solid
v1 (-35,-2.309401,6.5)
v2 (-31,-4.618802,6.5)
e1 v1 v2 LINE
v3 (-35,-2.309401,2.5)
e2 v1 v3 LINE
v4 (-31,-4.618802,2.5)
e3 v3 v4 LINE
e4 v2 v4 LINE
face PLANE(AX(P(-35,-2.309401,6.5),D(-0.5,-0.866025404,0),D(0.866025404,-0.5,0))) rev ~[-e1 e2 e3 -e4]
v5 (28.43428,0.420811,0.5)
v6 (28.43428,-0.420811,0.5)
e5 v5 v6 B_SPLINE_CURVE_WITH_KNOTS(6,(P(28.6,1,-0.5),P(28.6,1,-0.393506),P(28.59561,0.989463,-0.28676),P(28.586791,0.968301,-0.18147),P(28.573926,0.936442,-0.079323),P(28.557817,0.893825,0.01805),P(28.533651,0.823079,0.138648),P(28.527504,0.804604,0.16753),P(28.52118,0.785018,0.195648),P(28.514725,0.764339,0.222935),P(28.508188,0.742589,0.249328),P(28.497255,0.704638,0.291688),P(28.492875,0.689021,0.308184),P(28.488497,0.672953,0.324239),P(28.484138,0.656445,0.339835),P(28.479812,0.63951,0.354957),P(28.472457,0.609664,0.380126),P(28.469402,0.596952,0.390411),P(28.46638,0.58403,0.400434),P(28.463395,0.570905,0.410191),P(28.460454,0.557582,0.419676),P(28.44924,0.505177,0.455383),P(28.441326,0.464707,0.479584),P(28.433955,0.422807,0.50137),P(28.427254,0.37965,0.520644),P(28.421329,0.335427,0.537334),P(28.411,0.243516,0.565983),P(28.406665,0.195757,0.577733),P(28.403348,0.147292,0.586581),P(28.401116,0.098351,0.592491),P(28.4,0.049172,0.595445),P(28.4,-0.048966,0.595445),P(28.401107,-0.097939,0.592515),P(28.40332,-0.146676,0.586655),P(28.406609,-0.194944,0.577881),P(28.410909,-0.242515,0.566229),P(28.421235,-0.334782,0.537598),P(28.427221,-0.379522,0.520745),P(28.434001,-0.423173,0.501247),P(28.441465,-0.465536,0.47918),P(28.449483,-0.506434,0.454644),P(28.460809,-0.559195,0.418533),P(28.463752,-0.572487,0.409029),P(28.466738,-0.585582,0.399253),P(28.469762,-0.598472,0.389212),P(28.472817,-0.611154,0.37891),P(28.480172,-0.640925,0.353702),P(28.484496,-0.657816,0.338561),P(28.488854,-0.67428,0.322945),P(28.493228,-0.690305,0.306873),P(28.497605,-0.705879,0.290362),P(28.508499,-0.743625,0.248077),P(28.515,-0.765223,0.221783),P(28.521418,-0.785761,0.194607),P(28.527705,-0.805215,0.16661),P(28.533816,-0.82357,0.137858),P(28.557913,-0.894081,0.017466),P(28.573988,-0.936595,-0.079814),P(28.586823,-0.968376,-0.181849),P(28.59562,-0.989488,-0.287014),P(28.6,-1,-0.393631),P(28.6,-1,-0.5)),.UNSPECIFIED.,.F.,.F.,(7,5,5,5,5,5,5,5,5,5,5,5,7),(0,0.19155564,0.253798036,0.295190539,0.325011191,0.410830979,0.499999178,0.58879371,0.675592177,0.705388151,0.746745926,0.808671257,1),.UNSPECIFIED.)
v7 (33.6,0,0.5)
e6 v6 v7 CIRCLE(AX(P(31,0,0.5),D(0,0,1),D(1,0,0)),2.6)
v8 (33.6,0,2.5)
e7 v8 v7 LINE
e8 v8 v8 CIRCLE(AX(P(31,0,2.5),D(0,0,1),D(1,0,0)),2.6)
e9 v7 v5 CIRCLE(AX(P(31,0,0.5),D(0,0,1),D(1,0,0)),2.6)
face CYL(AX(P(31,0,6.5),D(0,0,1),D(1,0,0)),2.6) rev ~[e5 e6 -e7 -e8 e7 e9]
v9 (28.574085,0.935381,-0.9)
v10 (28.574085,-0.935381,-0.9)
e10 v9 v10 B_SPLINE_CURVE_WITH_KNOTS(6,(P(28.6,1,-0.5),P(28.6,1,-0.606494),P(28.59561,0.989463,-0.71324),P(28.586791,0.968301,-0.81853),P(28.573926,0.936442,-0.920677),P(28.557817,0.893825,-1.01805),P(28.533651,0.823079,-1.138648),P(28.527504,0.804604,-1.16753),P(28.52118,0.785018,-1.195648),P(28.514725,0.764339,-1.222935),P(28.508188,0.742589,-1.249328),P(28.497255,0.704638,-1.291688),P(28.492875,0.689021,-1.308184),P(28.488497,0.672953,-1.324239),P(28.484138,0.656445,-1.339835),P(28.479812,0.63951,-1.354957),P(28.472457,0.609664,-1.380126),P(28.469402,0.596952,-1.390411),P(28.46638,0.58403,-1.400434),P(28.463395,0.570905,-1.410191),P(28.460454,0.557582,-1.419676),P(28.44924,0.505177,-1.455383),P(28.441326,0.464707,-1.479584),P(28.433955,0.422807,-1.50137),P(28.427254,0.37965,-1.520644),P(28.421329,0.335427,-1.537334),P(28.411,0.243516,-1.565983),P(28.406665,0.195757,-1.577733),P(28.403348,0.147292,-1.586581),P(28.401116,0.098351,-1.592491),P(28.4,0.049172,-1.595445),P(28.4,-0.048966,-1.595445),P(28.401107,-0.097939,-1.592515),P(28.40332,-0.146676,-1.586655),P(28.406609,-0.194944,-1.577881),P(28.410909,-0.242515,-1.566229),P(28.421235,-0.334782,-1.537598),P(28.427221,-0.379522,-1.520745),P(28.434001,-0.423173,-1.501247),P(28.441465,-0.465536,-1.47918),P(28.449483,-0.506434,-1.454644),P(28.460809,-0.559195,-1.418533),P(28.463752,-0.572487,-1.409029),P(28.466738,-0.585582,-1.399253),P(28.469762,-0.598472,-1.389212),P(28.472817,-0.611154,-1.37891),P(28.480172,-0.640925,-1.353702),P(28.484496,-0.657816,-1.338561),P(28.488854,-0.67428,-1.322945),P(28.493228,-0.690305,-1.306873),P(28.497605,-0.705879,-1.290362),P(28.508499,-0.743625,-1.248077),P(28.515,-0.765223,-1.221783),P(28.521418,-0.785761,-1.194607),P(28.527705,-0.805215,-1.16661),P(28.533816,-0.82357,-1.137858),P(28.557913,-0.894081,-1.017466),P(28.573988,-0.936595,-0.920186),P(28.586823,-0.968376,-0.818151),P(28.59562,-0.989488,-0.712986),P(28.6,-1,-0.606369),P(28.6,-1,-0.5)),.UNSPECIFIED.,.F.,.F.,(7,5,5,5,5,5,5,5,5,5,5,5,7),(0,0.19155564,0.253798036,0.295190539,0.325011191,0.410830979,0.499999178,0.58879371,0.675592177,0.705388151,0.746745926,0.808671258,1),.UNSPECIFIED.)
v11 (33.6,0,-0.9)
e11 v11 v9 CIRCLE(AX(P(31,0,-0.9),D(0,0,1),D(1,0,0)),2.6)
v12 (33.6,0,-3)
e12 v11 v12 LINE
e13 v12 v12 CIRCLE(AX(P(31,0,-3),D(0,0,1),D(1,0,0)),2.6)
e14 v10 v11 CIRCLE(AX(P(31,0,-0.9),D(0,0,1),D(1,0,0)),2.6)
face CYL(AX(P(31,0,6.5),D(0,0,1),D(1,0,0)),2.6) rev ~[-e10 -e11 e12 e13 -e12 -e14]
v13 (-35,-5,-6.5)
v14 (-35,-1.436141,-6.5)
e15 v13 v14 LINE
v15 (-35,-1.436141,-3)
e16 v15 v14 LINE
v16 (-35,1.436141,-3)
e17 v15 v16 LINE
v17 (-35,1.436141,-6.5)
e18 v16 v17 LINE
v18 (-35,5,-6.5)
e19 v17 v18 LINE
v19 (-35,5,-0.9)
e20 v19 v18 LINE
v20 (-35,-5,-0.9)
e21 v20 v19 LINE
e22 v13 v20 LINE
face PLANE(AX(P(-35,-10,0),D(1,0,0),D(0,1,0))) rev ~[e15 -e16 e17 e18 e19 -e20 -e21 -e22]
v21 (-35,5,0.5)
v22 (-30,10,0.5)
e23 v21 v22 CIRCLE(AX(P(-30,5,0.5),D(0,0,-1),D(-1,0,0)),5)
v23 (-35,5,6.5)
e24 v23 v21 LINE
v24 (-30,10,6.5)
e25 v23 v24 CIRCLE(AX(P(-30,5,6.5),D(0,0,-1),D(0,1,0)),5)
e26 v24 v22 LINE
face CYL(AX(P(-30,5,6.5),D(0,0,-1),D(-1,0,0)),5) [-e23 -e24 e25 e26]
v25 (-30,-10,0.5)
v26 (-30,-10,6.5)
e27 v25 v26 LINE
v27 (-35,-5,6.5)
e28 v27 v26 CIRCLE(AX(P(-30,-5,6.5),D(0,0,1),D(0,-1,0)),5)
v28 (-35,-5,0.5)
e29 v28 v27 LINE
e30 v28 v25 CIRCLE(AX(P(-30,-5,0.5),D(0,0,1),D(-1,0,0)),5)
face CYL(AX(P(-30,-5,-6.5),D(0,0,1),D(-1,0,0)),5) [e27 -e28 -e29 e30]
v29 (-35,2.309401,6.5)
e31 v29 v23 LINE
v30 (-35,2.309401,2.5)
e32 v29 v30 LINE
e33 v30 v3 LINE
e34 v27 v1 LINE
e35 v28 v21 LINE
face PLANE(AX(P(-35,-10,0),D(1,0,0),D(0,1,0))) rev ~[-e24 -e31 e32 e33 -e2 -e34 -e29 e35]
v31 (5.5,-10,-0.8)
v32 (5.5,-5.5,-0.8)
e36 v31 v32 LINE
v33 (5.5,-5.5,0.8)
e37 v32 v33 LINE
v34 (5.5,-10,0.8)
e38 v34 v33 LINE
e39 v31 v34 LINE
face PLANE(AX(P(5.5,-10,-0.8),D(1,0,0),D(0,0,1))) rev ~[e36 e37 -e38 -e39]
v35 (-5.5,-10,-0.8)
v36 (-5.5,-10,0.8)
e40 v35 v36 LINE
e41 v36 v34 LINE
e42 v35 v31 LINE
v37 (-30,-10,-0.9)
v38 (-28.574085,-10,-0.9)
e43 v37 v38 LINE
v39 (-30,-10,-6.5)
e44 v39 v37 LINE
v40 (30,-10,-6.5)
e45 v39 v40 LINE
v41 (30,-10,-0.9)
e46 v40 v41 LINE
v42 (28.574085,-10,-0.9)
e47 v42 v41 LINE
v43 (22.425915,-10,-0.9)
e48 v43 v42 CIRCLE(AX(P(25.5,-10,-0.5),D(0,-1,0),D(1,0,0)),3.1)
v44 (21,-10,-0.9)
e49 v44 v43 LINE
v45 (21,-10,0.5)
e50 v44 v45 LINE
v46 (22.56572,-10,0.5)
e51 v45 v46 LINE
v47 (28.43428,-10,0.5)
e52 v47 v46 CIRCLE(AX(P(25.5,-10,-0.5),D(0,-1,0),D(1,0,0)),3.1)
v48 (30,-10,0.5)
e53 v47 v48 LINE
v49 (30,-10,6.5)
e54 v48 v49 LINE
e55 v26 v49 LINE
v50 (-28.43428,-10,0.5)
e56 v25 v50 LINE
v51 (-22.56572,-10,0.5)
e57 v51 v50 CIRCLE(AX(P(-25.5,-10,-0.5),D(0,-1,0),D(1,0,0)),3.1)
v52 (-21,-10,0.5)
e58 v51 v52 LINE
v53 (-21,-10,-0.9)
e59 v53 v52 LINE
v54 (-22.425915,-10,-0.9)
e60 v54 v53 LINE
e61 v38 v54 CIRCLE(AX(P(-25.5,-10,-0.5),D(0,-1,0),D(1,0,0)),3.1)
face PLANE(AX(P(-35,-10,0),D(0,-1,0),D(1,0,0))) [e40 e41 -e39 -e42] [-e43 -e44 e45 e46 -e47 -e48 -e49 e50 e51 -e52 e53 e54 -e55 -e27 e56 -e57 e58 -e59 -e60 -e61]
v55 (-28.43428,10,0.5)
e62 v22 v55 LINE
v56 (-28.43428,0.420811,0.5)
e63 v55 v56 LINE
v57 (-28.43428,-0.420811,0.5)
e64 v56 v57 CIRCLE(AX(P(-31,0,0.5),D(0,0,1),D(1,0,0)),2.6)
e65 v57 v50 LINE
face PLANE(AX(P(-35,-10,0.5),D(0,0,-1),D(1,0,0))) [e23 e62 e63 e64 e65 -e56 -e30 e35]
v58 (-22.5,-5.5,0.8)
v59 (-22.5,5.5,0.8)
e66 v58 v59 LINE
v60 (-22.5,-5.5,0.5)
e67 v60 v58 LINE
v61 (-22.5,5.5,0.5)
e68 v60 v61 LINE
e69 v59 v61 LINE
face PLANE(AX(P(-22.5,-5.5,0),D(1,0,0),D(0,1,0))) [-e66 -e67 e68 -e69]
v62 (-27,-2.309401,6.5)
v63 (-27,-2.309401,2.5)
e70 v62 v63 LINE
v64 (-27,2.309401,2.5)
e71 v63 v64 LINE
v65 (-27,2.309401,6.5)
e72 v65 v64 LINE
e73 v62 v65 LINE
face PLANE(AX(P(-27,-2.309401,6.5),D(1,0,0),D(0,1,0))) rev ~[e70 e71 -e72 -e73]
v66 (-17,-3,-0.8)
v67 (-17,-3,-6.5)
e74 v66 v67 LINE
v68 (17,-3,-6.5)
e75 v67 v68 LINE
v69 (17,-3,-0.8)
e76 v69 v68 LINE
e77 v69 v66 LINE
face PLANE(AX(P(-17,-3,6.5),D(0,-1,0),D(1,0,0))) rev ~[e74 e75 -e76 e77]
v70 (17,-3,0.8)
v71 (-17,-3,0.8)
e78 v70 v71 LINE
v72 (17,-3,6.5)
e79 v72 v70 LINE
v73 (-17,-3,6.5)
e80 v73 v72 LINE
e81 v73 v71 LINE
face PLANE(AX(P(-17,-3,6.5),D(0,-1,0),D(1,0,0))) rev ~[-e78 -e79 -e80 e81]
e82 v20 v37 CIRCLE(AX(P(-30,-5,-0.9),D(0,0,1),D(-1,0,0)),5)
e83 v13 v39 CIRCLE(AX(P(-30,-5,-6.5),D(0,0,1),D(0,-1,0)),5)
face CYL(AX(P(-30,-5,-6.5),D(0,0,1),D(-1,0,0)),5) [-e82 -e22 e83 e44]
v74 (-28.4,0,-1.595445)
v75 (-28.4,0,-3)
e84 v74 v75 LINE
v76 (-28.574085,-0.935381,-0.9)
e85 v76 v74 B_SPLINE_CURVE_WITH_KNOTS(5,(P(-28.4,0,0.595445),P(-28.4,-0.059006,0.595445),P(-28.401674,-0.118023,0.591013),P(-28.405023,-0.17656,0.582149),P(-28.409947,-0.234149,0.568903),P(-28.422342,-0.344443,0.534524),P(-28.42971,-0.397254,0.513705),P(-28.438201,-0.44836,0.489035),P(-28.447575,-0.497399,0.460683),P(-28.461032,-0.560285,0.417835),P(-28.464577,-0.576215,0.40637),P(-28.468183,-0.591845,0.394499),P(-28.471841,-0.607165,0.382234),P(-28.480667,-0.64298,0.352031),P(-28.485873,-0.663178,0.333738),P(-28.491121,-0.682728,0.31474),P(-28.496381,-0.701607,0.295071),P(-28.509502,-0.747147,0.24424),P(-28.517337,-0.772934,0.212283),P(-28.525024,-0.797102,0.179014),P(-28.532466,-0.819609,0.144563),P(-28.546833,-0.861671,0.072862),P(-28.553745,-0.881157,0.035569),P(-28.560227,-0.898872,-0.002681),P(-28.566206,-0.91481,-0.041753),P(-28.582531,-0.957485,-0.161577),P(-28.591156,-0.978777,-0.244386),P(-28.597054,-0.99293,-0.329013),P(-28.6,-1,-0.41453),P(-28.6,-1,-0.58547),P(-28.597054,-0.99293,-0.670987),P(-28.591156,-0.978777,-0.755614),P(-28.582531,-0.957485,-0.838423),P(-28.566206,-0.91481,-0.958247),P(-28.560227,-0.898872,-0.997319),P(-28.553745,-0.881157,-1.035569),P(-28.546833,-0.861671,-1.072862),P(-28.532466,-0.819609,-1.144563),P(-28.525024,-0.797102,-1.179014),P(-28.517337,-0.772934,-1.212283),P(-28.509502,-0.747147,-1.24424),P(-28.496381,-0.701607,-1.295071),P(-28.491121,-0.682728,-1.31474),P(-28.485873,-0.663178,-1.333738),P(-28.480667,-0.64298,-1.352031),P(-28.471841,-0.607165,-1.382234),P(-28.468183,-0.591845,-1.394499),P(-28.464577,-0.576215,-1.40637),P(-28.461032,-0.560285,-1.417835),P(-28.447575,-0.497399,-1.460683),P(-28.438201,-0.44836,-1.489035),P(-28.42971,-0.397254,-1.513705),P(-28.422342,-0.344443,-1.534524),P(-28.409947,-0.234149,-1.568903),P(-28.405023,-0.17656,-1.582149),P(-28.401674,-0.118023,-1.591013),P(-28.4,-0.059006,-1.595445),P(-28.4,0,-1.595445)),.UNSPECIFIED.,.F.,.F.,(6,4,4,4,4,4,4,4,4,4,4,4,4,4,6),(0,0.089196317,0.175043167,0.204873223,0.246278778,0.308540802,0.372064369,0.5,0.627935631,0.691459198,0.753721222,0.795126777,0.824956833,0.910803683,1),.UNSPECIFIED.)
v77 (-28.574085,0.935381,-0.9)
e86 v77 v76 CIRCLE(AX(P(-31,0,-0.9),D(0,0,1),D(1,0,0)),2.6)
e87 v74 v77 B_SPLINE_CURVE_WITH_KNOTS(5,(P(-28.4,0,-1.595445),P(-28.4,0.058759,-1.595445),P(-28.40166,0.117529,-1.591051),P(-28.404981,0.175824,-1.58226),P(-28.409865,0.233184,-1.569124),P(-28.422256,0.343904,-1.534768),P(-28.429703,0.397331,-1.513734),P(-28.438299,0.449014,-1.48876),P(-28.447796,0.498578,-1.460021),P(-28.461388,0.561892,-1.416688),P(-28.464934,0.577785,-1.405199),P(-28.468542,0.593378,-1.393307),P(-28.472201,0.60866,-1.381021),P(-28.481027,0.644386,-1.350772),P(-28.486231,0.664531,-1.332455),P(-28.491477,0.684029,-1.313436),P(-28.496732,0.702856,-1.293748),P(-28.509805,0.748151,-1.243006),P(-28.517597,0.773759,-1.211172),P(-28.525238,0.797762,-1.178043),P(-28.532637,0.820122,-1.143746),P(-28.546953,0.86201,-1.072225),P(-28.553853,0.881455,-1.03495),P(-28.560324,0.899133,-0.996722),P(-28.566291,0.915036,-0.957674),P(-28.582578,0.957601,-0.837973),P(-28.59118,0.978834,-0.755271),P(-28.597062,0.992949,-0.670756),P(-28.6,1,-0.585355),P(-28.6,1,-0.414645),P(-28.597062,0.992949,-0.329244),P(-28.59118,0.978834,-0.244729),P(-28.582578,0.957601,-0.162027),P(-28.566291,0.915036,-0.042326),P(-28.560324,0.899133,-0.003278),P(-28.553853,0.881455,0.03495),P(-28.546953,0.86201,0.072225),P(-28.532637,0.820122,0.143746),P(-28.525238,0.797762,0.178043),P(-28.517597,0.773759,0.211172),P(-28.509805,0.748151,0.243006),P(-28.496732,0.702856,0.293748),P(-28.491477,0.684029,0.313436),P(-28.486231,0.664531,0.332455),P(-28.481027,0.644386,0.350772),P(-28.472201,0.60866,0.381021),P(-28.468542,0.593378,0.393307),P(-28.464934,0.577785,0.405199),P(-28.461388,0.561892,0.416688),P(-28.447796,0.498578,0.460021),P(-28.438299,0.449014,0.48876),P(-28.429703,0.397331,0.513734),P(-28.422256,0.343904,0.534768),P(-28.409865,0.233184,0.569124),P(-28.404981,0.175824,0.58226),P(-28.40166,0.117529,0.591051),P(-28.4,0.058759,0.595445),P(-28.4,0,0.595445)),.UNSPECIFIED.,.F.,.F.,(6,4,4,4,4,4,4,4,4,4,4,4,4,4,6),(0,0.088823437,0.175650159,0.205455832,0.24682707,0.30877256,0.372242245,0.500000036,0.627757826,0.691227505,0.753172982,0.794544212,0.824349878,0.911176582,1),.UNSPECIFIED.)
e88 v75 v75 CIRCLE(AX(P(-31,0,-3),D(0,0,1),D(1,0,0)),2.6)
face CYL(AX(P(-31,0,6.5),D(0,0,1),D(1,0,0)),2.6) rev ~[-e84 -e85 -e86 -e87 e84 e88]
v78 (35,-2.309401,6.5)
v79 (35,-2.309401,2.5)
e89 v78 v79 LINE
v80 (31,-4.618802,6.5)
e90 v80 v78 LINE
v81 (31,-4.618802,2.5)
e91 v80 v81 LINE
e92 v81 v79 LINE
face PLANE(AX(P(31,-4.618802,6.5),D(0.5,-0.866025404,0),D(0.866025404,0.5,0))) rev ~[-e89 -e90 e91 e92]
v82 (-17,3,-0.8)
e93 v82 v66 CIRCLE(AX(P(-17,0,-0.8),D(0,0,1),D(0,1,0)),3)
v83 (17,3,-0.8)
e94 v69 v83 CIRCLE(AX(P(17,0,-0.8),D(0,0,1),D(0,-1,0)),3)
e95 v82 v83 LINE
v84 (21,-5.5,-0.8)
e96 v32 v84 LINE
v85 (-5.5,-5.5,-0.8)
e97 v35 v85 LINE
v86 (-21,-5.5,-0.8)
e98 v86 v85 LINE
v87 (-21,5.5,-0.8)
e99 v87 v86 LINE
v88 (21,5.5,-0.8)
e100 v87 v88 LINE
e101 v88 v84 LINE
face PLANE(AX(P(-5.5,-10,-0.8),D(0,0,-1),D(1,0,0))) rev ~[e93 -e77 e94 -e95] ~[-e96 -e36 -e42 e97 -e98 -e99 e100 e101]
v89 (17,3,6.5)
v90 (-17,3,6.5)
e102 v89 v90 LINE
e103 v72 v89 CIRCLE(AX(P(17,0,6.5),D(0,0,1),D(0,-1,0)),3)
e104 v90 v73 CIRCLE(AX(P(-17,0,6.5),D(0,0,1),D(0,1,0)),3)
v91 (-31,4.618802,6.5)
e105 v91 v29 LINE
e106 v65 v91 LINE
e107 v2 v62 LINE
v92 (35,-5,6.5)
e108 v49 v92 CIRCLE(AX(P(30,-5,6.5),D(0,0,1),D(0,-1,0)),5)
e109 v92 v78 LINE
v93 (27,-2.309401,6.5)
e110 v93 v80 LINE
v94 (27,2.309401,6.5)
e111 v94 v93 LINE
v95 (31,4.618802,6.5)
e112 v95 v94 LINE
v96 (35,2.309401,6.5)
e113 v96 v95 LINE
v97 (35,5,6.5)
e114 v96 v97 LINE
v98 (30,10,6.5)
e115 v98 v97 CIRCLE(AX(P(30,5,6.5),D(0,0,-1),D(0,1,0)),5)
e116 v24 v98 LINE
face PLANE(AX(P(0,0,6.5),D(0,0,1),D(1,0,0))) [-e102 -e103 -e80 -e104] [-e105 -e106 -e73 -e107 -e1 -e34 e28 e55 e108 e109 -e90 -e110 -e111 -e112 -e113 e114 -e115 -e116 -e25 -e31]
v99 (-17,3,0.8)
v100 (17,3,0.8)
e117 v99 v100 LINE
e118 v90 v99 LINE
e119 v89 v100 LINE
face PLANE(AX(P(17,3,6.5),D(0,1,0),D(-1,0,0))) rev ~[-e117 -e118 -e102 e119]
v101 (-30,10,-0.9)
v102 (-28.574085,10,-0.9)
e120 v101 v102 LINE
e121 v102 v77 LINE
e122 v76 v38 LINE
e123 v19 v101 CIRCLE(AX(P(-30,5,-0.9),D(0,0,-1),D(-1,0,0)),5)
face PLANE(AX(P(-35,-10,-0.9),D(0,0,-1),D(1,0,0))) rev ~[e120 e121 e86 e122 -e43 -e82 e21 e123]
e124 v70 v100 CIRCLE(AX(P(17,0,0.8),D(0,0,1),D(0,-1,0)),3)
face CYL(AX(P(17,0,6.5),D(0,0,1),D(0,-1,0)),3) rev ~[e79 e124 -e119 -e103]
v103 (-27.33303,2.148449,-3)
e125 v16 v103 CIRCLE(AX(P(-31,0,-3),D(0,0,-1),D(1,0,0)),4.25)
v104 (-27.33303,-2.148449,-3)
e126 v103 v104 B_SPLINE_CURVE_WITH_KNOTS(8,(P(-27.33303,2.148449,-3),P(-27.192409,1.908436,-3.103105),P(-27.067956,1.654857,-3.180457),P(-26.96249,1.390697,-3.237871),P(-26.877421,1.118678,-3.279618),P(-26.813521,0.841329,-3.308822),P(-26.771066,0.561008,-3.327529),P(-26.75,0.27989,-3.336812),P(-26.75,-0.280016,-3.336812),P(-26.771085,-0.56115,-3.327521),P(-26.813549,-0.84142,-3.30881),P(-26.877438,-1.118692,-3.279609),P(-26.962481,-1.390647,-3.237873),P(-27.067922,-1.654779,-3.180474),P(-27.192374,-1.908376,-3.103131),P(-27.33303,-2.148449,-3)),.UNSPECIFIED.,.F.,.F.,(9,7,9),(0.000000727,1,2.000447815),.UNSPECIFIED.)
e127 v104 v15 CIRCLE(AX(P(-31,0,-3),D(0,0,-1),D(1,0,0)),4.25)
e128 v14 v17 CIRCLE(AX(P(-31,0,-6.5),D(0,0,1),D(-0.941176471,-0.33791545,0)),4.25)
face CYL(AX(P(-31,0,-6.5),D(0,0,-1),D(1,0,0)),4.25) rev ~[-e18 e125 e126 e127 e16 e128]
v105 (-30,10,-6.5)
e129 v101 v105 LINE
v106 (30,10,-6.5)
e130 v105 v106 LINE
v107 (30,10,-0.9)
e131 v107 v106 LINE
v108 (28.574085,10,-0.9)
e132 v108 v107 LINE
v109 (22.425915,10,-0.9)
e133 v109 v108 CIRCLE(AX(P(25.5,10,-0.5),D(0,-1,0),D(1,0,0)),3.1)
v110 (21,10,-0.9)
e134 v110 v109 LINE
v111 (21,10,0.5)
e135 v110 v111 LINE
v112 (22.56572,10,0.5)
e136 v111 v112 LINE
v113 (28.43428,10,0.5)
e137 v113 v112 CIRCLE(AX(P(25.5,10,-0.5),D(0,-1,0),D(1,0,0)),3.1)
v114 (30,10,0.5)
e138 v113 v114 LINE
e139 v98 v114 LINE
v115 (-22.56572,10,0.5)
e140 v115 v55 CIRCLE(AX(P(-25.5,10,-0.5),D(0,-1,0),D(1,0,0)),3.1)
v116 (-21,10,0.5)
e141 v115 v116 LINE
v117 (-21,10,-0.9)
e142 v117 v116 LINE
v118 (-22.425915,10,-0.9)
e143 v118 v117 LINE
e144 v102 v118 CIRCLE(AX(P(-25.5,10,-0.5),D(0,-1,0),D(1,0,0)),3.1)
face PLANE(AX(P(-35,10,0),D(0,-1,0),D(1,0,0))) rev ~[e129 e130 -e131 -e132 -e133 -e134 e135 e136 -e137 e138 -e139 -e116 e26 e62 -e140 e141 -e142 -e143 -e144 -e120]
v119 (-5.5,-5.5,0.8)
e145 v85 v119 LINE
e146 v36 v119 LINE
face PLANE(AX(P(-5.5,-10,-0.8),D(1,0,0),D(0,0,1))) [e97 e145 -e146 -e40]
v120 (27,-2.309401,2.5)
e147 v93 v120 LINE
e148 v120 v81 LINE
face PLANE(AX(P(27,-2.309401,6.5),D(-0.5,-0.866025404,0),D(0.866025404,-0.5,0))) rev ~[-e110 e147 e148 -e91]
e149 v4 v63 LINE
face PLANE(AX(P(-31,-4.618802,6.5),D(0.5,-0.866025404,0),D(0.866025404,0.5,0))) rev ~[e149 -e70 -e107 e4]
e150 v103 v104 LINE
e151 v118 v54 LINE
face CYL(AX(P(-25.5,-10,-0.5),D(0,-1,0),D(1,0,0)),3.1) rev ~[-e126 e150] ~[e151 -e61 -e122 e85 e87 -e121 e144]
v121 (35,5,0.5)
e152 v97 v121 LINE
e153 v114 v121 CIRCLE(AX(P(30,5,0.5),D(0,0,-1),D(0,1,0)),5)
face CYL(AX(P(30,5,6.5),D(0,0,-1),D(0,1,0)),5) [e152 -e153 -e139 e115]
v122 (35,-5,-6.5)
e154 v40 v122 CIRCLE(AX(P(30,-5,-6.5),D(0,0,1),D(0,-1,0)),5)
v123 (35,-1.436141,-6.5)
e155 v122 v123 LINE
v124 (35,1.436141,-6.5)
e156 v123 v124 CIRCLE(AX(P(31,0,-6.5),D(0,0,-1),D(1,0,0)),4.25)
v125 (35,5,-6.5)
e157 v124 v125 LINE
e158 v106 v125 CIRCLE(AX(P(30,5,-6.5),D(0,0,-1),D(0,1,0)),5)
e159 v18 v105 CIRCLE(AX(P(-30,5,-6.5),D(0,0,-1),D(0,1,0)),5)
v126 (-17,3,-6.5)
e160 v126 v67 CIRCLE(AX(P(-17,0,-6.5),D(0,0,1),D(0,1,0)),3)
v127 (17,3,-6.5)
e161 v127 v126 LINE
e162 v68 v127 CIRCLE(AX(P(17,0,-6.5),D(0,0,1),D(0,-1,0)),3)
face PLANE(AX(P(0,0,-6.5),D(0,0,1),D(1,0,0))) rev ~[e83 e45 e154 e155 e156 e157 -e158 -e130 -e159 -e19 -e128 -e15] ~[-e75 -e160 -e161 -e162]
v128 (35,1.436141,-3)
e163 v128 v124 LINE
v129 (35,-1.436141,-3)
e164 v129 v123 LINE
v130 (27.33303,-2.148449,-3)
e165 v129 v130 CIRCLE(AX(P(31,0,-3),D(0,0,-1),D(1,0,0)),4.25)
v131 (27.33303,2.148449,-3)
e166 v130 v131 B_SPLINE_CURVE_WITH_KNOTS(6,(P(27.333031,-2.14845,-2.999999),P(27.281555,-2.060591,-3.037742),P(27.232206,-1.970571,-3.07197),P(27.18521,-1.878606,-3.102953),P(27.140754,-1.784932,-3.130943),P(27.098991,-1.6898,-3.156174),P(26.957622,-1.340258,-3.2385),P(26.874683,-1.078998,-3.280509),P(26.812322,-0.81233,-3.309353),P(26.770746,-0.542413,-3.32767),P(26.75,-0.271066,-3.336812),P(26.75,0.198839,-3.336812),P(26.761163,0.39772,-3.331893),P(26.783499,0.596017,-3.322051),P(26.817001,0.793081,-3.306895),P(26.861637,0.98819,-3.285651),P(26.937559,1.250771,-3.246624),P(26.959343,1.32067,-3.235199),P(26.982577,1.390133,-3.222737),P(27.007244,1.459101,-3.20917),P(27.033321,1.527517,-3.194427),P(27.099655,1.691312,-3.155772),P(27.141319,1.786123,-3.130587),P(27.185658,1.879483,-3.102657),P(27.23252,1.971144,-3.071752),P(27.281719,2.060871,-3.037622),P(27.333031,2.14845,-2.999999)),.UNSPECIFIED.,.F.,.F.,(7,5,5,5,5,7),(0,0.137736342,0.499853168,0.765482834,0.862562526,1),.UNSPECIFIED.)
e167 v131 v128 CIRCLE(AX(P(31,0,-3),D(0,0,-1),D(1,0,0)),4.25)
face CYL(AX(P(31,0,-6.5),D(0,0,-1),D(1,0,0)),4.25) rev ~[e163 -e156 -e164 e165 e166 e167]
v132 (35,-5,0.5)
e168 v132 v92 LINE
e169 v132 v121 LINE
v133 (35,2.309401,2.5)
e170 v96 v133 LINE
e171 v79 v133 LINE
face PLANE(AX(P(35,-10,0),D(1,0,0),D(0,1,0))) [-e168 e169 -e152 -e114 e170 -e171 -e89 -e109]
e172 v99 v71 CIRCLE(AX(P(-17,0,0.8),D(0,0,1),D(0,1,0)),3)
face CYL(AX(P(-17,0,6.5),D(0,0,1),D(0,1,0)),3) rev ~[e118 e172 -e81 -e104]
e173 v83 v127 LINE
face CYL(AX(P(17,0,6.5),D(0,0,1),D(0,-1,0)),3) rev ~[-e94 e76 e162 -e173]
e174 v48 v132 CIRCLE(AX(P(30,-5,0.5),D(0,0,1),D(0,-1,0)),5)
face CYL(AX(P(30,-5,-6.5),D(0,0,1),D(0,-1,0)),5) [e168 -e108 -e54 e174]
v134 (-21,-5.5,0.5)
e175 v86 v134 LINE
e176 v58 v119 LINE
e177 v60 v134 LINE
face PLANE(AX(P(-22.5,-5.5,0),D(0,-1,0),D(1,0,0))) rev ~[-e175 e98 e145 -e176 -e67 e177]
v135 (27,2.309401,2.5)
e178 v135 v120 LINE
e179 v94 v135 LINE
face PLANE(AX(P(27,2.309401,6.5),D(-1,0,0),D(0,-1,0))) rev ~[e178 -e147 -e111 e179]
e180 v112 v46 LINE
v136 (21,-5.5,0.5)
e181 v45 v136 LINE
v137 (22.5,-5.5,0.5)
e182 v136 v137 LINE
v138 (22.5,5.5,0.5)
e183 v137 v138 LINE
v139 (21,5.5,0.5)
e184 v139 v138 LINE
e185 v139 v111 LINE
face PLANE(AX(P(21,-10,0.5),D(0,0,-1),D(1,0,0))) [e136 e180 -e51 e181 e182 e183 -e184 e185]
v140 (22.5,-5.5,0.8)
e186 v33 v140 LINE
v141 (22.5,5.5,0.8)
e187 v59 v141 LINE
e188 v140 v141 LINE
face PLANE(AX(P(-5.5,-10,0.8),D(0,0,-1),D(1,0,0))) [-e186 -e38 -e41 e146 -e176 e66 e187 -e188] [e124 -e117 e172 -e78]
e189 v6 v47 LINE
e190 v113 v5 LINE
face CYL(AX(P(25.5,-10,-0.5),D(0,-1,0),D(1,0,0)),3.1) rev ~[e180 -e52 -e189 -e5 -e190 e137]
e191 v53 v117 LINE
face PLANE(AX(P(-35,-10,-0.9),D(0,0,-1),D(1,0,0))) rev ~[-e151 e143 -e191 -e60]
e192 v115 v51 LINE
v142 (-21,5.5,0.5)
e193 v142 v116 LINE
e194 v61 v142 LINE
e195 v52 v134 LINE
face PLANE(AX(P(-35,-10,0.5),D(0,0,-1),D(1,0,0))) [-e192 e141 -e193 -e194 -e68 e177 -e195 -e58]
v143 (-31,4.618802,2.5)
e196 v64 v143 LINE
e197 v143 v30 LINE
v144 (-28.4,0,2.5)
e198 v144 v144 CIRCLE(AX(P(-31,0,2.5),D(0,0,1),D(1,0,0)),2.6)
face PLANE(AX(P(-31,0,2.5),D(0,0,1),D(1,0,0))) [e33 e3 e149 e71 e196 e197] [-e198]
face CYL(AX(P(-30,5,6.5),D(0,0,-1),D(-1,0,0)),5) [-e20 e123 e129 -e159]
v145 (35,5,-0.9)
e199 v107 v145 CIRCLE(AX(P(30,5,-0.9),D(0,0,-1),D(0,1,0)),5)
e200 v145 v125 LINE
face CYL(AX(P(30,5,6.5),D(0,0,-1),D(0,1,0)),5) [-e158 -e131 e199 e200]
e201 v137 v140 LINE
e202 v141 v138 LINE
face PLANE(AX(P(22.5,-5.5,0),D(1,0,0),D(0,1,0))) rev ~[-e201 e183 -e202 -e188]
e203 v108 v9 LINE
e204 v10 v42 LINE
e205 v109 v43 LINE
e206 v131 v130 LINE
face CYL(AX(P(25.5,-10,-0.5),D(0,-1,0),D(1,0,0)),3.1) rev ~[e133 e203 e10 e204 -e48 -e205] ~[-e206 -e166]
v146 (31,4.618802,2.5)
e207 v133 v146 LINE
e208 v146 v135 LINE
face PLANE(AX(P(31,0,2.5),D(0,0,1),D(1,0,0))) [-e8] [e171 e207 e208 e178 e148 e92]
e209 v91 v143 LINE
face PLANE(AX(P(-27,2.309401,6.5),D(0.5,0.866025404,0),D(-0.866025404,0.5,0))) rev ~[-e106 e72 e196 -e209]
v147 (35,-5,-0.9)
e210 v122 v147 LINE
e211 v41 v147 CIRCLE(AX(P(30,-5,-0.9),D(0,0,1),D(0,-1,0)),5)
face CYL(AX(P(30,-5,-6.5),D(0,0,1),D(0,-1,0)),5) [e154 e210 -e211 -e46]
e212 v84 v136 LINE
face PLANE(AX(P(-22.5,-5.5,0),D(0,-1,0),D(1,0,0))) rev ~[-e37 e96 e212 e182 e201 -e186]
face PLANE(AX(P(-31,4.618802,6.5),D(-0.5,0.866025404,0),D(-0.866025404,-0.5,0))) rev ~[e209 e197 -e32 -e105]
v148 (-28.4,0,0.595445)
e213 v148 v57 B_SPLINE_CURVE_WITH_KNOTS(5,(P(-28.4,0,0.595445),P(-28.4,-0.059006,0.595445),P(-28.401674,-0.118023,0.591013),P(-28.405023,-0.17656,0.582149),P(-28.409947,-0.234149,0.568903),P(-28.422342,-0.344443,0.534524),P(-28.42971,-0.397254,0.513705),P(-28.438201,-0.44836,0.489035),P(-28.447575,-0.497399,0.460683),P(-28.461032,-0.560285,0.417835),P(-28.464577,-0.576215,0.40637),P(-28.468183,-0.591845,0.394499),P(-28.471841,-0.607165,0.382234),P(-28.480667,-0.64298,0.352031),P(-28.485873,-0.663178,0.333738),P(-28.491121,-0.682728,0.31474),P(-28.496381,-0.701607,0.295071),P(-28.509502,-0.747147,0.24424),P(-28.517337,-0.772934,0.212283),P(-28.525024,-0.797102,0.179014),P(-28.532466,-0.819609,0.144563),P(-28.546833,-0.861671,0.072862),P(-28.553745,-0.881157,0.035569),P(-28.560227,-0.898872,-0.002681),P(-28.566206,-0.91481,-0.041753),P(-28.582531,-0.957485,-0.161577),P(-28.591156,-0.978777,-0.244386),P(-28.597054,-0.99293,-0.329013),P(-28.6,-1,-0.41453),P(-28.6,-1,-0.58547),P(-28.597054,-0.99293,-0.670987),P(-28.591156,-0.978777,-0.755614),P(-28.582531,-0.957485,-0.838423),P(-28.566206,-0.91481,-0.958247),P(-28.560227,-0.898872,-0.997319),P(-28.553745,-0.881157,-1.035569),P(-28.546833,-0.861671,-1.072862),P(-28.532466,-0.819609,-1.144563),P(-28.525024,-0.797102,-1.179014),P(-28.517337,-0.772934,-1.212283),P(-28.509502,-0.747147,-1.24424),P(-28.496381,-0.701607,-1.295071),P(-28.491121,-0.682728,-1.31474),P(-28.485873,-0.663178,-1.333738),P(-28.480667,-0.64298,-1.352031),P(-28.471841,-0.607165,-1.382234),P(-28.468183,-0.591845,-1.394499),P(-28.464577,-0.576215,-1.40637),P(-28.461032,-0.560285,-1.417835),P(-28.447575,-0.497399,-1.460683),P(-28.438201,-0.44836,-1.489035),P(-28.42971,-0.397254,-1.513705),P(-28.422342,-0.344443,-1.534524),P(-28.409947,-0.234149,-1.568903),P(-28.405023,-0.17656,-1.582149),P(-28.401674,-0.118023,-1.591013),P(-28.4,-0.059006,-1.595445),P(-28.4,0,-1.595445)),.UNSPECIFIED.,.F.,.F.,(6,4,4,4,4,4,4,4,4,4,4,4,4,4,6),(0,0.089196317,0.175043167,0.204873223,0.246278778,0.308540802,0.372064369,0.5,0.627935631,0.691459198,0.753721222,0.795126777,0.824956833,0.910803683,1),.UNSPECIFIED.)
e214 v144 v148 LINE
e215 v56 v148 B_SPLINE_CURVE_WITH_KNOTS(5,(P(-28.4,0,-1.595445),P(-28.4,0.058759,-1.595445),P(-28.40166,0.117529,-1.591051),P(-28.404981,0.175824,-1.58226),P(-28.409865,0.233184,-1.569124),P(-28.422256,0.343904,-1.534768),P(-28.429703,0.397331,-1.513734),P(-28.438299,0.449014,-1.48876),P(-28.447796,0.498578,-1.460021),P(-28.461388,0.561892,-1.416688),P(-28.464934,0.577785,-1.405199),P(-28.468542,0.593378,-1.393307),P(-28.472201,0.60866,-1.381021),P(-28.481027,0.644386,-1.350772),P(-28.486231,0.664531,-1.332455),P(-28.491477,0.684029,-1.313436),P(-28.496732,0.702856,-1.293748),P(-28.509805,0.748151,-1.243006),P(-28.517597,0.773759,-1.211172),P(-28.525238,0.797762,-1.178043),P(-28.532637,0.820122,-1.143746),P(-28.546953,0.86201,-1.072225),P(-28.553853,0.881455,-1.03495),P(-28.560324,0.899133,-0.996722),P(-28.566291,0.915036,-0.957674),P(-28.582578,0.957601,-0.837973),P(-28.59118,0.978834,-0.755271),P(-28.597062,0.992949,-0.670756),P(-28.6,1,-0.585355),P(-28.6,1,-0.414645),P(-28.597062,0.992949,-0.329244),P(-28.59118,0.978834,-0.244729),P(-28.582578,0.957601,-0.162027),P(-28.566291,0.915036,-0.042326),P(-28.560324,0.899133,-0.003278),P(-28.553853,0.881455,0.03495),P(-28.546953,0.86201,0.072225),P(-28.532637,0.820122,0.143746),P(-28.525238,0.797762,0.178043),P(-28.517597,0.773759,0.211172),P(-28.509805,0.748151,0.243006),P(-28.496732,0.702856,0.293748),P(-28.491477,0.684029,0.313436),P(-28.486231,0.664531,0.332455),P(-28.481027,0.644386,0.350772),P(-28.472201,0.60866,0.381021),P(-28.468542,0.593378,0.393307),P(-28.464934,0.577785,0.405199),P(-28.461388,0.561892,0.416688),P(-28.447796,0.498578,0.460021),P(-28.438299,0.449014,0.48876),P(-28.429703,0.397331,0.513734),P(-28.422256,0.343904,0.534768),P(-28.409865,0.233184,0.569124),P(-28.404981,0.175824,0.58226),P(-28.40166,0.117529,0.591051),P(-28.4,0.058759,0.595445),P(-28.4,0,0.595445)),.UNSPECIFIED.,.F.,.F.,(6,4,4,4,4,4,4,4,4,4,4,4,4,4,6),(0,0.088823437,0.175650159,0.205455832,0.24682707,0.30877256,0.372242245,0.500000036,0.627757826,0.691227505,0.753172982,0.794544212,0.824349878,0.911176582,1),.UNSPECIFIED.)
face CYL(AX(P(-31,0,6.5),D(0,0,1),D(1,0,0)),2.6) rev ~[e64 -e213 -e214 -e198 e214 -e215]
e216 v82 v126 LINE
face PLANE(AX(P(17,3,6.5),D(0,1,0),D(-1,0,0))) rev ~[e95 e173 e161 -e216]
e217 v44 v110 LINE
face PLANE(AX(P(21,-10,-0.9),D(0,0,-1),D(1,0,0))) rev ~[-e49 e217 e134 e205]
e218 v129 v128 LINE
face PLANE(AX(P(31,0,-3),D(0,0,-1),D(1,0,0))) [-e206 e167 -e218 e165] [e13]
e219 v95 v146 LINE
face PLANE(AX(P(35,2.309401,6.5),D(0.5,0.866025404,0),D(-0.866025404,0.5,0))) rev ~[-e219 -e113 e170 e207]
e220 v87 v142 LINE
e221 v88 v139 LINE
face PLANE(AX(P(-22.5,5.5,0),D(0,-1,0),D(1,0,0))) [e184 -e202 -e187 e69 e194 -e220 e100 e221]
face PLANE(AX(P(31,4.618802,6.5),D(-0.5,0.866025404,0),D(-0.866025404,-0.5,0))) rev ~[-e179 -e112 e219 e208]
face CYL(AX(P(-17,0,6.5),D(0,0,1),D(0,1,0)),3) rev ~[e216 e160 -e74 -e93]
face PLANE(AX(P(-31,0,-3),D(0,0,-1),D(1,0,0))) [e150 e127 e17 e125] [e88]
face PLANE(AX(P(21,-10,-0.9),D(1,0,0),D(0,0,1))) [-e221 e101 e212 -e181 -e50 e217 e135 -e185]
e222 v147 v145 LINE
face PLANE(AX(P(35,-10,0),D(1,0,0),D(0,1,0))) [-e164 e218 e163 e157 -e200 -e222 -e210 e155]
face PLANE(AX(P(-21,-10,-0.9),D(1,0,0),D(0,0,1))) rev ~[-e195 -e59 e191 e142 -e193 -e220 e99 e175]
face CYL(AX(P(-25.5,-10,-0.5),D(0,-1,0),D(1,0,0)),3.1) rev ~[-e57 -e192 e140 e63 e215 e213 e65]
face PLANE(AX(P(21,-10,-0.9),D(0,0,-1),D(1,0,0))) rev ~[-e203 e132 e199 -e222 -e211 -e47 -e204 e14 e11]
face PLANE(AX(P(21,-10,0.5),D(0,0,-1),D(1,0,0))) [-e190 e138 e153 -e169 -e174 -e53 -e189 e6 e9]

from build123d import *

# Parameters (mm, degrees)
F0_W      = 70
F0_H      = 20
F1_DEPTH  = 6.5
F4_DEPTH  = 4
F5_R      = 2.6
F6_DEPTH  = 13.001
F7_DEPTH  = 13.001
F9_R      = 5
F8_R      = 3.1
F10_DEPTH = 20.001
F11_W     = 45
F11_H     = 11
F12_DEPTH = 0.8
F13_W     = 11
F13_H     = 1.6
F14_DEPTH = 4.5
F15_W     = 14
F15_H     = 1.4
F16_DEPTH = 20.0010001
F17_R     = 4.25
F18_DEPTH = 3.5


with BuildPart() as f1:
    # F0 (on Top) → F1 (new body, symmetric)
    with BuildSketch(Plane.XY):
        Rectangle(F0_W, F0_H)
    extrude(amount=F1_DEPTH, both=True)

    # F3 (on face) → F4 (cut)
    with BuildSketch(Plane.XY.offset(6.5)):
        Polygon((-31, -4.6188021535), (-27, -2.3094010768), (-27, 2.3094010768), (-31, 4.6188021535), (-35, 2.3094010768), (-35, -2.3094010768), align=None)
        Polygon((35, -2.3094010768), (35, 2.3094010768), (31, 4.6188021535), (27, 2.3094010768), (27, -2.3094010768), (31, -4.6188021535), align=None)
    extrude(amount=-F4_DEPTH, mode=Mode.SUBTRACT)

    # F5 (on face) → F6 (cut, through all)
    with BuildSketch(Plane.XY.offset(6.5)):
        with Locations((-31, 0)):
            Circle(F5_R)
        with Locations((31, 0)):
            Circle(F5_R)
    extrude(amount=-F6_DEPTH, mode=Mode.SUBTRACT)

    # F2 (on face) → F7 (cut, through all)
    with BuildSketch(Plane.XY.offset(6.5)):
        with BuildLine():
            Line((-17, -3), (17, -3))
            ThreePointArc((17, -3), (20, 0), (17, 3))
            Line((17, 3), (-17, 3))
            ThreePointArc((-17, 3), (-20, 0), (-17, -3))
        make_face()
    extrude(amount=-F7_DEPTH, mode=Mode.SUBTRACT)

    # F9
    f9_edges = [f1.edges().sort_by_distance(p)[0] for p in [
        (35, -10, 0),
        (-35, -10, 0),
        (35, 10, 0),
        (-35, 10, 0),
    ]]
    fillet(f9_edges, radius=F9_R)

    # F8 (on face) → F10 (cut, through all)
    with BuildSketch(Plane.XZ.offset(10)):
        with Locations((-25.5, -0.5)):
            Circle(F8_R)
        with Locations((25.5, -0.5)):
            Circle(F8_R)
    extrude(amount=-F10_DEPTH, mode=Mode.SUBTRACT)

    # F11 (on Top) → F12 (cut, symmetric)
    with BuildSketch(Plane.XY):
        Rectangle(F11_W, F11_H)
    extrude(amount=F12_DEPTH, both=True, mode=Mode.SUBTRACT)

    # F13 (on face) → F14 (cut, through all)
    with BuildSketch(Plane.XZ.offset(10)):
        Rectangle(F13_W, F13_H)
    extrude(amount=-F14_DEPTH, mode=Mode.SUBTRACT)

    # F15 (on face) → F16 (cut, through all)
    with BuildSketch(Plane.XZ.offset(10)):
        with Locations((-28, -0.2)):
            Rectangle(F15_W, F15_H)
        with Locations((28, -0.2)):
            Rectangle(F15_W, F15_H)
    extrude(amount=-F16_DEPTH, mode=Mode.SUBTRACT)

    # F17 (on face) → F18 (cut)
    with BuildSketch(Plane(origin=(0, 0, -6.5), x_dir=(1, 0, 0), z_dir=(0, 0, -1))):
        with Locations((31, 0)):
            Circle(F17_R)
        with Locations((-31, 0)):
            Circle(F17_R)
    extrude(amount=-F18_DEPTH, mode=Mode.SUBTRACT)


solid = f1.part
